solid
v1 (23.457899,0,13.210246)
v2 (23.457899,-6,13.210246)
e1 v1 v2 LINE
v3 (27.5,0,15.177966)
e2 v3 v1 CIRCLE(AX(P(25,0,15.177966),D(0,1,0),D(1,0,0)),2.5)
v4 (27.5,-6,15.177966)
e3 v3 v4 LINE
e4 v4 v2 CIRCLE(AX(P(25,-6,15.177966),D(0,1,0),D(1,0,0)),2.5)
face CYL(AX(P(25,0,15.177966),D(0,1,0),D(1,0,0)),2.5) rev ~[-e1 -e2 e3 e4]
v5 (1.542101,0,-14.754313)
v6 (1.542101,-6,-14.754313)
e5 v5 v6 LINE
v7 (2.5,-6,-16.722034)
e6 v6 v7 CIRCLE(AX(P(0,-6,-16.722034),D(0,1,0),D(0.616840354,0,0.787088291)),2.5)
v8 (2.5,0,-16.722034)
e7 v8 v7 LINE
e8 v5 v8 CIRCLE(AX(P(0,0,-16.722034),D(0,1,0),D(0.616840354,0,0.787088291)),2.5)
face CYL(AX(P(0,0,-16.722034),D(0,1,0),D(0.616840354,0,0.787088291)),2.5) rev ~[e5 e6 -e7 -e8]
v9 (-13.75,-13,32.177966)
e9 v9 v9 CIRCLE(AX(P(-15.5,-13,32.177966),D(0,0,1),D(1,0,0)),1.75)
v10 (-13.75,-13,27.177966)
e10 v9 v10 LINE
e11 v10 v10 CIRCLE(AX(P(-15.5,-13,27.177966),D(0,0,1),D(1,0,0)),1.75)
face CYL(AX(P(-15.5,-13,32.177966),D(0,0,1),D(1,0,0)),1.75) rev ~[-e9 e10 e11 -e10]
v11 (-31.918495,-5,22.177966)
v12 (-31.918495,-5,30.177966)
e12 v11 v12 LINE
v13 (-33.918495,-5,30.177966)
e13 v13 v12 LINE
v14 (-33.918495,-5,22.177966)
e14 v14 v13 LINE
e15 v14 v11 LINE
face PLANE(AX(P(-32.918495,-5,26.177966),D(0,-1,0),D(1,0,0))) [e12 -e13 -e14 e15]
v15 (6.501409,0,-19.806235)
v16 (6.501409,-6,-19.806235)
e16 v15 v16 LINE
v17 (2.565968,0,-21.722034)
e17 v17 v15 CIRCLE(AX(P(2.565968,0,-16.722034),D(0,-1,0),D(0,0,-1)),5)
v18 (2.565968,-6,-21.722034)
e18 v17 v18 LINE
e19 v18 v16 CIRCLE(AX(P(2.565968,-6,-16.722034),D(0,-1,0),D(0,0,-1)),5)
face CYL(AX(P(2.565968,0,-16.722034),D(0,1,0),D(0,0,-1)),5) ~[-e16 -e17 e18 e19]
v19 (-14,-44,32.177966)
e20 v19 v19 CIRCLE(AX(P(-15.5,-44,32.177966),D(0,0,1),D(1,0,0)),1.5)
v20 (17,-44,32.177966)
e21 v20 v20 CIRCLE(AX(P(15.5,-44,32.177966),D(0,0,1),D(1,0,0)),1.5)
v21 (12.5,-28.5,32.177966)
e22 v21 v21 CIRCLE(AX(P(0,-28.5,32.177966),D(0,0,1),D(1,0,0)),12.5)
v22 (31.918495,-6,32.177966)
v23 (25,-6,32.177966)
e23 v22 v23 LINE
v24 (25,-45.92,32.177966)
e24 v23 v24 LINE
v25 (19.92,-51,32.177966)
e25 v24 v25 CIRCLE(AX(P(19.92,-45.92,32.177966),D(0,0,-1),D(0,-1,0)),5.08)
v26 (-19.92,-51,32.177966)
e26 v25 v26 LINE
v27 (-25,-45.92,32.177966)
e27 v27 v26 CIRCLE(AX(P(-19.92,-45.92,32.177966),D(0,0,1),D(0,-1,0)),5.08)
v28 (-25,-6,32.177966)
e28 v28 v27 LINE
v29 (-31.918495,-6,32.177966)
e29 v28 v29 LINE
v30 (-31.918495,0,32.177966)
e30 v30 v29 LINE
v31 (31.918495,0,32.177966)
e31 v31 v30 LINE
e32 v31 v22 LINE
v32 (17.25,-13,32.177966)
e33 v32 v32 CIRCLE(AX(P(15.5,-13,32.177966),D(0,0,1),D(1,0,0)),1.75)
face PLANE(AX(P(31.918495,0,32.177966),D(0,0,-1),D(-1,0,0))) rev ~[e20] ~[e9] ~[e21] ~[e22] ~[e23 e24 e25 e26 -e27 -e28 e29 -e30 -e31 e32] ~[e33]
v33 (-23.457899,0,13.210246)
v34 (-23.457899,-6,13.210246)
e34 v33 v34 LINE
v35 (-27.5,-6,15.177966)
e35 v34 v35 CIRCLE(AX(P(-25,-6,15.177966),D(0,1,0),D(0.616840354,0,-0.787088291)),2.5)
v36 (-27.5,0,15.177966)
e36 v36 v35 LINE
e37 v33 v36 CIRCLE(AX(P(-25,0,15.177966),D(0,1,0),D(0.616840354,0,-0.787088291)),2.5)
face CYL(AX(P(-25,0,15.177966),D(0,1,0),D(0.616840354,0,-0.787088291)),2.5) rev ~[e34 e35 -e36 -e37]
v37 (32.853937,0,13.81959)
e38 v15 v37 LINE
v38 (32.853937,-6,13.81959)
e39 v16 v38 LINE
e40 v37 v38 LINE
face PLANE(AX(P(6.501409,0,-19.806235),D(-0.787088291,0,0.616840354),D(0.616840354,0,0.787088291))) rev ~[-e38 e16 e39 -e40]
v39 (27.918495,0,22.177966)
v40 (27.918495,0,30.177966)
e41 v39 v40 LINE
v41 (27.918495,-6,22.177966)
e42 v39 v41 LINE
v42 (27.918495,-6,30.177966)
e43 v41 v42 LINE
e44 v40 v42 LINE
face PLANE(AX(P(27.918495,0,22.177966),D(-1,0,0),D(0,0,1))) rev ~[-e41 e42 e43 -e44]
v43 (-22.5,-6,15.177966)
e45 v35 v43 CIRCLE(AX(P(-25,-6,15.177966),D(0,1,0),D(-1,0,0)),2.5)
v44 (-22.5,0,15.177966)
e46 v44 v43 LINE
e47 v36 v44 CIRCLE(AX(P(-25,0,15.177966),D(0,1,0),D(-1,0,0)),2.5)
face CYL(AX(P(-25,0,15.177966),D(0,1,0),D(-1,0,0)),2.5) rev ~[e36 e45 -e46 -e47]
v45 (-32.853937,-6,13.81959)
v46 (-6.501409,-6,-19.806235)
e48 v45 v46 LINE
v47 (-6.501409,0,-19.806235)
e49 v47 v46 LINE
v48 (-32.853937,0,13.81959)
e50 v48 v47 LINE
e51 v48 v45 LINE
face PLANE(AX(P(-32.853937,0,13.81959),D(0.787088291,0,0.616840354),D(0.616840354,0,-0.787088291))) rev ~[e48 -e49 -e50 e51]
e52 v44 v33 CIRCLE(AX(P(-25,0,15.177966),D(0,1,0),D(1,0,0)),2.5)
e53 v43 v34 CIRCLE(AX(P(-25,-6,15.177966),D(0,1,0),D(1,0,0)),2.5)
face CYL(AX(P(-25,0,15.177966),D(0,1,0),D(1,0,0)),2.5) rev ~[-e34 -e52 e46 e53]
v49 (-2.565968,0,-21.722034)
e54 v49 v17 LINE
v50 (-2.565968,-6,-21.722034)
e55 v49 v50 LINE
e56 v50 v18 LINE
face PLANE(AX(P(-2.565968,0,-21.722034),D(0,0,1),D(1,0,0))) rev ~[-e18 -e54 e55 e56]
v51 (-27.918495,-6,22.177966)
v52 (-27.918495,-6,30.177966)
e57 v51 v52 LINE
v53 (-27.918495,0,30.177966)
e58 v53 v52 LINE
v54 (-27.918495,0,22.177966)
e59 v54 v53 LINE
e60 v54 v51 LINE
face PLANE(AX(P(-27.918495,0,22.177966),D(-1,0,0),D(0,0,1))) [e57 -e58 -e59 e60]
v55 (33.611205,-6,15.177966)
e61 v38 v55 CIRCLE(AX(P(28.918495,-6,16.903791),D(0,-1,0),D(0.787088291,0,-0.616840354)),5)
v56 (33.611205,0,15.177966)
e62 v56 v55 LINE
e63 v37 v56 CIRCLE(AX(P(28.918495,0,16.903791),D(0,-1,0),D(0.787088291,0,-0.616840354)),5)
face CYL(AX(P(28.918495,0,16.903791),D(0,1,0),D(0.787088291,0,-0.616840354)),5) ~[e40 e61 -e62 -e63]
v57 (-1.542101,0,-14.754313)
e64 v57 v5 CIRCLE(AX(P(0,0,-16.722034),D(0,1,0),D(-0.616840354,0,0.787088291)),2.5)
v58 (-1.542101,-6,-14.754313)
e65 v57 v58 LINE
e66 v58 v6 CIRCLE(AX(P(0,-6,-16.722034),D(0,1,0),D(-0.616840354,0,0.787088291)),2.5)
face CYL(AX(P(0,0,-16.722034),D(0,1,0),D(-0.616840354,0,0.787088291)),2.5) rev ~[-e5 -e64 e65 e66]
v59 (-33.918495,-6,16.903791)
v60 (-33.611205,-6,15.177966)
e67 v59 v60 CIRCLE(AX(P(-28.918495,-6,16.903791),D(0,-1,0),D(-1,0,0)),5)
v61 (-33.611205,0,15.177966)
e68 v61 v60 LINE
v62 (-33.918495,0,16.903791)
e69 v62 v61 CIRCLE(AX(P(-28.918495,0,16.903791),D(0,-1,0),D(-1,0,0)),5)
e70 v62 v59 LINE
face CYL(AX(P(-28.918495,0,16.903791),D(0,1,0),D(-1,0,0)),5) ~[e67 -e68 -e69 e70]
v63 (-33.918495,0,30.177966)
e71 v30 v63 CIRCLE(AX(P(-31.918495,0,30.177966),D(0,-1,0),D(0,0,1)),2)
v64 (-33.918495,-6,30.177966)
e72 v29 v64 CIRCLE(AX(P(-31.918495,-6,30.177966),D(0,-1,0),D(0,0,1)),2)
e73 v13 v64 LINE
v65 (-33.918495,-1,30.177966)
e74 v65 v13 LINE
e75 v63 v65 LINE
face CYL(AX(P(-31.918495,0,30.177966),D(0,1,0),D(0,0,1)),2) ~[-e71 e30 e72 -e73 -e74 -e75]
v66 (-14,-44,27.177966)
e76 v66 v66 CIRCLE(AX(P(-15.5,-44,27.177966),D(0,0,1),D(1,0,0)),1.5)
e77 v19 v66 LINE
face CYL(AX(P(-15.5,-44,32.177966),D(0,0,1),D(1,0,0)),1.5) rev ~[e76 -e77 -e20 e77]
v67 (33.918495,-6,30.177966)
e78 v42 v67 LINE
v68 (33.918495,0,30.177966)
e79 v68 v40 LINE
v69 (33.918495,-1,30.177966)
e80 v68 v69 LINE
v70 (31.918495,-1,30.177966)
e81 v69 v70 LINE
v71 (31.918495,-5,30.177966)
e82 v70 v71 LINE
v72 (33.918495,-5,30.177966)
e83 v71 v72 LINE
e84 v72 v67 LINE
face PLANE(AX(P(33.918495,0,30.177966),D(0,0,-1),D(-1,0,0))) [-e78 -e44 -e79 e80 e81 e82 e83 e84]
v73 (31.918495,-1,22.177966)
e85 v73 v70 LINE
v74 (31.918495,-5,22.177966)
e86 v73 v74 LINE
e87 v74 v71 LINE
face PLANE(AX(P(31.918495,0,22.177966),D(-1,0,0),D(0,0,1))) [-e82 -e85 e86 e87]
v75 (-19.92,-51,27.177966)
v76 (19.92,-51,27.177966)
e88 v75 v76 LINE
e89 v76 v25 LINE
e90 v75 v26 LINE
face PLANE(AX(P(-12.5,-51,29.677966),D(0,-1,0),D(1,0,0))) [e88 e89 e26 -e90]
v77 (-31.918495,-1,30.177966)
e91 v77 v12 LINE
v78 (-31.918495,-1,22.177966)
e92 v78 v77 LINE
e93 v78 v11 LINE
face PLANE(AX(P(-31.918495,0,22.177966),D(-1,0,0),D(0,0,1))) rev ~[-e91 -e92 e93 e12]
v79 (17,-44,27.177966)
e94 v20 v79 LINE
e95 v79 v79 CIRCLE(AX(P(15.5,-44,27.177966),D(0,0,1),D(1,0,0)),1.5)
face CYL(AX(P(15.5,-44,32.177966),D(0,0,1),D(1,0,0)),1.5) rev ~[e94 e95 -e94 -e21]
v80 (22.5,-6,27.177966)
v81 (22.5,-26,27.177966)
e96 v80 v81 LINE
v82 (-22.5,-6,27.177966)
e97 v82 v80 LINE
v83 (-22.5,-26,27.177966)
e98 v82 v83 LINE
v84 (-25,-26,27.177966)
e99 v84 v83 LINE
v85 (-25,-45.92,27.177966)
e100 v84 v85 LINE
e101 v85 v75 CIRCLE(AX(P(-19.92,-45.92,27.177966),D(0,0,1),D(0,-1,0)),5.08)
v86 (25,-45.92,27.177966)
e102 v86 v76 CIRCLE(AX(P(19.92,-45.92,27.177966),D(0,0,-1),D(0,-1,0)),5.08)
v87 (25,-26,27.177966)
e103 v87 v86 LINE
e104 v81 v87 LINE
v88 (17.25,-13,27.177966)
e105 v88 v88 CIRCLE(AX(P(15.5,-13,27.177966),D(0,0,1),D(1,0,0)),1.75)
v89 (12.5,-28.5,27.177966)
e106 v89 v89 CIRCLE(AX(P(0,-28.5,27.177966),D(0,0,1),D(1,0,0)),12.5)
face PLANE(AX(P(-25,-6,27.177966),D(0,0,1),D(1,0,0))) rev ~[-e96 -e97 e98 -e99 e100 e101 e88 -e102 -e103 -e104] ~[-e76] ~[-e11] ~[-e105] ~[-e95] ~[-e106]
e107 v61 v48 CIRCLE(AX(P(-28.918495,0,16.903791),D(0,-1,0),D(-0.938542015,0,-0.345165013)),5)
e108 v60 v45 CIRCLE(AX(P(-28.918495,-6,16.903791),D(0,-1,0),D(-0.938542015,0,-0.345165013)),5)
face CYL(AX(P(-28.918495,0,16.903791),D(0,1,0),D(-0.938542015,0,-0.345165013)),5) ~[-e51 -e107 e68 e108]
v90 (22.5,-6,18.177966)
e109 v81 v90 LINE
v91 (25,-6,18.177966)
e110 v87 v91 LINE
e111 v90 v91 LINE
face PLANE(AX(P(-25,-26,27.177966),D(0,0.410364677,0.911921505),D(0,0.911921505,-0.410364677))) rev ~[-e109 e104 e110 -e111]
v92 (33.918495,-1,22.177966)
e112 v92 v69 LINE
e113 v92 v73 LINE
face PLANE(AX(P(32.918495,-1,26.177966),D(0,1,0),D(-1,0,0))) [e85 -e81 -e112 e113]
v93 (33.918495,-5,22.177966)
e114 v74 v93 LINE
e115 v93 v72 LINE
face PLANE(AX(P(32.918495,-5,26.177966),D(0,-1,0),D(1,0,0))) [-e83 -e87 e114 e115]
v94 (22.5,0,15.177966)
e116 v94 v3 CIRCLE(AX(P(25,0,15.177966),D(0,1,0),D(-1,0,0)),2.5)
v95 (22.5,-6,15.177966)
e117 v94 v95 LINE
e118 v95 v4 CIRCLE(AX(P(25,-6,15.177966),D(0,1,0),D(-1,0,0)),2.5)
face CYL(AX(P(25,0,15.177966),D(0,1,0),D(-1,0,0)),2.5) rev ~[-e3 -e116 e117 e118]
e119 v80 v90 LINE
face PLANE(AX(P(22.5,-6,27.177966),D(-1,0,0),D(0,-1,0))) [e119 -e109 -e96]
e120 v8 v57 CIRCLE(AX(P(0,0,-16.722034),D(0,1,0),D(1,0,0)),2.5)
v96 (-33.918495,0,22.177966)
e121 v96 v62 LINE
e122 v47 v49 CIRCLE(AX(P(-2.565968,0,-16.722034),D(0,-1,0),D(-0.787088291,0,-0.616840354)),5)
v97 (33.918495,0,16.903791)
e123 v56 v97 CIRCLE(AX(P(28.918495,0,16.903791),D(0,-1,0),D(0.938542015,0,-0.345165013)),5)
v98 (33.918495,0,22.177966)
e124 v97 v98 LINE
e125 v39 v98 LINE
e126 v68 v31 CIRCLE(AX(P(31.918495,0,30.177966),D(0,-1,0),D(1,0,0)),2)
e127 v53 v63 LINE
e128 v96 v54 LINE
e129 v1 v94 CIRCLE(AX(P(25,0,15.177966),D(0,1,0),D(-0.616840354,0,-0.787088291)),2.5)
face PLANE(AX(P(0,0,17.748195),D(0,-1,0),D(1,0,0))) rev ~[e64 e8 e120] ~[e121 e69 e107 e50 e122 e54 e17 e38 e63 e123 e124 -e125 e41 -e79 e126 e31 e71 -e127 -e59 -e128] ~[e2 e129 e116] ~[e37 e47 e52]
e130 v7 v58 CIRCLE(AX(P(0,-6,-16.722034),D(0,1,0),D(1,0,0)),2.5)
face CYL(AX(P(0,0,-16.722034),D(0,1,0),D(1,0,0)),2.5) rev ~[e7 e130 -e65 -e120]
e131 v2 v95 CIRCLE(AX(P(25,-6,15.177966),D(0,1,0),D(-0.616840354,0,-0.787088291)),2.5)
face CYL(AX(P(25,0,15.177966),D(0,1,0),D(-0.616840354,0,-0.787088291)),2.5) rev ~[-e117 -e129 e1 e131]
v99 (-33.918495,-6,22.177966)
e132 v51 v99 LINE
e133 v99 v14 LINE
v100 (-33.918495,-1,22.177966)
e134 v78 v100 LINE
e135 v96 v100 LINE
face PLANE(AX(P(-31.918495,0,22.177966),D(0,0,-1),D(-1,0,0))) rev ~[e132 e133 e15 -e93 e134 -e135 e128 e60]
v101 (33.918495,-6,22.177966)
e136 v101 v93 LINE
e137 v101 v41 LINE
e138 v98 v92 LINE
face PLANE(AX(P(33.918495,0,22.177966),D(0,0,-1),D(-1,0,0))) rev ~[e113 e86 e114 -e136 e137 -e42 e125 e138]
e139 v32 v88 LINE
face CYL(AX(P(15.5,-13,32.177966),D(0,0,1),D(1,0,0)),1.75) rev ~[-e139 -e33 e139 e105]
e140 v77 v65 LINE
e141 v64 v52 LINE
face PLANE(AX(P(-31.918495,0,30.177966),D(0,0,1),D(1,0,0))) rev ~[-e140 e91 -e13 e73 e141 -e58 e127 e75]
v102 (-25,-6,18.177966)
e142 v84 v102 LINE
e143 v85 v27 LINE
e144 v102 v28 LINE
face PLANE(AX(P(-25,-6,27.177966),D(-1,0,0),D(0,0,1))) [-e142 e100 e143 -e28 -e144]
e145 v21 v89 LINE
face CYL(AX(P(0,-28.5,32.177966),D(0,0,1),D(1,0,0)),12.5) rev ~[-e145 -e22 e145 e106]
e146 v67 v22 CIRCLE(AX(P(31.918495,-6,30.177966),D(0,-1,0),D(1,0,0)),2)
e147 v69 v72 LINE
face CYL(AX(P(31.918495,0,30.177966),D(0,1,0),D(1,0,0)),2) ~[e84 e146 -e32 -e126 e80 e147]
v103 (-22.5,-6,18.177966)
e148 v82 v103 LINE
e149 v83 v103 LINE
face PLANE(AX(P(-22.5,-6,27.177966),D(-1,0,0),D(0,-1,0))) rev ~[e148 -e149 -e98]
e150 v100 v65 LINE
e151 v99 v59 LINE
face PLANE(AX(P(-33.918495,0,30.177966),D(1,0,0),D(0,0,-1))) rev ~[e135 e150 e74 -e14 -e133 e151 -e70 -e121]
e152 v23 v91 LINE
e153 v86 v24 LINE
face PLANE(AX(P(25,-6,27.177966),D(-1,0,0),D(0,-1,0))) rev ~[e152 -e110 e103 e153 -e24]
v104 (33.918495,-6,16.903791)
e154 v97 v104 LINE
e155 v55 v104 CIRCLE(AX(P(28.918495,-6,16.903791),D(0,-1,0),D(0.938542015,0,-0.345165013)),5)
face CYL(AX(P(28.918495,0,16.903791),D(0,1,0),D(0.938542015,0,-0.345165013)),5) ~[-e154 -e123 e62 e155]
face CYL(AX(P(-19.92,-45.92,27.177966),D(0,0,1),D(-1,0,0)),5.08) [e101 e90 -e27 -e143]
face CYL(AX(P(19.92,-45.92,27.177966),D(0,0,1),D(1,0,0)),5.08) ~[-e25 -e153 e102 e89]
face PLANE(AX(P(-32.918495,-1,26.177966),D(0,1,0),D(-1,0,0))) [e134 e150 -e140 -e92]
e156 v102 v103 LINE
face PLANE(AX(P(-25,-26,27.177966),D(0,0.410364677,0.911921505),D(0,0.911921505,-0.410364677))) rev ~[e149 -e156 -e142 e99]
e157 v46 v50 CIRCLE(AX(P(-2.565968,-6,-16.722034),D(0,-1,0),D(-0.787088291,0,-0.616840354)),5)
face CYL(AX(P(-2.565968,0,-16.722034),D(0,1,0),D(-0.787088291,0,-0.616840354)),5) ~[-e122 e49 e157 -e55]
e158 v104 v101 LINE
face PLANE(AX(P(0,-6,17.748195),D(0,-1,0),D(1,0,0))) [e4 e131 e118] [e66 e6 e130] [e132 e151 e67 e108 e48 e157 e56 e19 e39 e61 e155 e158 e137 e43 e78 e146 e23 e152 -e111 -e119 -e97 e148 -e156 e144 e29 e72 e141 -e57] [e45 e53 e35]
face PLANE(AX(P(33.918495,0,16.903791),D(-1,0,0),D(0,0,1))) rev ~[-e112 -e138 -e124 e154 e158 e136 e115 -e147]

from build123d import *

# Parameters (mm, degrees)
F0_W      = 4
F0_H      = 8
F0_W_2    = 2
F1_DEPTH  = 6
F2_W      = 2
F2_H      = 8
F3_DEPTH  = 1
F4_W      = 2
F4_H      = 8
F5_DEPTH  = 1
F6_W      = 25
F6_H      = 5
F7_DEPTH  = 45
F8_R      = 5.08
F9_W      = 2.5
F9_H      = 20
F10_DEPTH = 9
F12_DEPTH = 50.292
F13_R     = 12.5
F13_R_2   = 1.75
F13_R_3   = 1.5
F14_DEPTH = 25.4


# Not quite as in the source:
# - a feature names something its author has since deleted; it is built from what else it names


with BuildPart() as f1:
    # F0 (on Front) → F1 (new body)
    with BuildSketch(Plane.XZ):
        with BuildLine():
            Line((-22.5, 15.1779663801), (-15.95, 15.1779663801))
            Line((-15.95, 15.1779663801), (15.95, 15.1779663801))
            Line((15.95, 15.1779663801), (22.5, 15.1779663801))
            ThreePointArc((22.5, 15.1779663801), (25, 17.6779663801), (27.5, 15.1779663801))
            Line((27.5, 15.1779663801), (33.6112053721, 15.1779663801))
            ThreePointArc((33.6112053721, 15.1779663801), (33.8410734014, 16.027307097), (33.9184952978, 16.9037914461))
            Line((33.9184952978, 16.9037914461), (33.9184952978, 19.2973875134))
            Line((33.9184952978, 19.2973875134), (33.9184952978, 20.1779663801))
            Line((33.9184952978, 20.1779663801), (33.0379164311, 20.1779663801))
            Line((33.0379164311, 20.1779663801), (-32.6408470514, 20.1779663801))
            Line((-32.6408470514, 20.1779663801), (-33.9184952978, 20.1779663801))
            Line((-33.9184952978, 20.1779663801), (-33.9184952978, 18.9003181337))
            Line((-33.9184952978, 18.9003181337), (-33.9184952978, 16.9037914461))
            ThreePointArc((-33.9184952978, 16.9037914461), (-33.8410734014, 16.027307097), (-33.6112053721, 15.1779663801))
            Line((-33.6112053721, 15.1779663801), (-27.5, 15.1779663801))
            ThreePointArc((-27.5, 15.1779663801), (-25, 17.6779663801), (-22.5, 15.1779663801))
        make_face()
        with BuildLine():
            Line((15.95, 15.1779663801), (-15.95, 15.1779663801))
            Line((-15.95, 15.1779663801), (-22.5, 15.1779663801))
            ThreePointArc((-22.5, 15.1779663801), (-22.7521952698, 14.0837205691), (-23.457899116, 13.2102456521))
            Line((-23.457899116, 13.2102456521), (-1.542100884, -14.7543128919))
            ThreePointArc((-1.542100884, -14.7543128919), (0, -14.2220336199), (1.542100884, -14.7543128919))
            Line((1.542100884, -14.7543128919), (23.457899116, 13.2102456521))
            ThreePointArc((23.457899116, 13.2102456521), (22.7521952698, 14.0837205691), (22.5, 15.1779663801))
            Line((22.5, 15.1779663801), (15.95, 15.1779663801))
        make_face()
        with BuildLine():
            ThreePointArc((-23.457899116, 13.2102456521), (-26.094245811, 12.9301616499), (-27.5, 15.1779663801))
            Line((-27.5, 15.1779663801), (-33.6112053721, 15.1779663801))
            ThreePointArc((-33.6112053721, 15.1779663801), (-33.28570797, 14.4691552359), (-32.8539367538, 13.819589678))
            Line((-32.8539367538, 13.819589678), (-6.5014092727, -19.8062353879))
            ThreePointArc((-6.5014092727, -19.8062353879), (-4.7544594387, -21.2176430802), (-2.5659678166, -21.7220336199))
            Line((-2.5659678166, -21.7220336199), (0, -21.7220336199))
            Line((0, -21.7220336199), (0, -19.2220336199))
            ThreePointArc((0, -19.2220336199), (-2.3631866008, -17.5377229541), (-1.542100884, -14.7543128919))
            Line((-1.542100884, -14.7543128919), (-23.457899116, 13.2102456521))
        make_face()
        with BuildLine():
            Line((33.6112053721, 15.1779663801), (27.5, 15.1779663801))
            ThreePointArc((27.5, 15.1779663801), (26.094245811, 12.9301616499), (23.457899116, 13.2102456521))
            Line((23.457899116, 13.2102456521), (1.542100884, -14.7543128919))
            ThreePointArc((1.542100884, -14.7543128919), (2.2478047302, -15.6277878088), (2.5, -16.7220336199))
            ThreePointArc((2.5, -16.7220336199), (1.767766953, -18.4898005728), (0, -19.2220336199))
            Line((0, -19.2220336199), (0, -21.7220336199))
            Line((0, -21.7220336199), (2.5659678166, -21.7220336199))
            ThreePointArc((2.5659678166, -21.7220336199), (4.7544594387, -21.2176430802), (6.5014092727, -19.8062353879))
            Line((6.5014092727, -19.8062353879), (32.8539367538, 13.819589678))
            ThreePointArc((32.8539367538, 13.819589678), (33.28570797, 14.4691552359), (33.6112053721, 15.1779663801))
        make_face()
        with BuildLine():
            Line((-33.9184952978, 30.1779663801), (-33.9184952978, 20.1779663801))
            Line((-33.9184952978, 20.1779663801), (-32.6408470514, 20.1779663801))
            Line((-32.6408470514, 20.1779663801), (33.0379164311, 20.1779663801))
            Line((33.0379164311, 20.1779663801), (33.9184952978, 20.1779663801))
            Line((33.9184952978, 20.1779663801), (33.9184952978, 22.1779663801))
            Line((33.9184952978, 22.1779663801), (31.9184952978, 22.1779663801))
            Line((31.9184952978, 22.1779663801), (27.9184952978, 22.1779663801))
            Line((27.9184952978, 22.1779663801), (27.9184952978, 30.1779663801))
            Line((27.9184952978, 30.1779663801), (31.9184952978, 30.1779663801))
            Line((31.9184952978, 30.1779663801), (33.9184952978, 30.1779663801))
            ThreePointArc((33.9184952978, 30.1779663801), (33.3327088602, 31.5921799425), (31.9184952978, 32.1779663801))
            Line((31.9184952978, 32.1779663801), (-31.9184952978, 32.1779663801))
            ThreePointArc((-31.9184952978, 32.1779663801), (-33.3327088602, 31.5921799425), (-33.9184952978, 30.1779663801))
        make_face()
        with Locations((-29.9184952978, 26.1779663801)):
            Rectangle(F0_W, F0_H, mode=Mode.SUBTRACT)
        with Locations((32.9184952978, 26.1779663801)):
            Rectangle(F0_W_2, F0_H)
    extrude(amount=F1_DEPTH)

    # F2 (on face) → F3 (cut)
    with BuildSketch(Plane(origin=(0, 0, 0), x_dir=(-1, 0, 0), z_dir=(0, 1, 0))):
        with Locations((-32.9184952978, 26.1779663801)):
            Rectangle(F2_W, F2_H)
        with Locations((32.9184952978, 26.1779663801)):
            Rectangle(F2_W, F2_H)
    extrude(amount=-F3_DEPTH, mode=Mode.SUBTRACT)

    # F4 (on face) → F5 (cut)
    with BuildSketch(Plane.XZ.offset(6)):
        with Locations((-32.9184952978, 26.1779663801)):
            Rectangle(F4_W, F4_H)
        with Locations((32.9184952978, 26.1779663801)):
            Rectangle(F4_W, F4_H)
    extrude(amount=-F5_DEPTH, mode=Mode.SUBTRACT)

    # F6 (on face) → F7 (join)
    with BuildSketch(Plane.XZ.offset(6)):
        with Locations((-12.5, 29.6779663801)):
            Rectangle(F6_W, F6_H)
        with Locations((12.5, 29.6779663801)):
            Rectangle(F6_W, F6_H)
    extrude(amount=F7_DEPTH)

    # F8
    f8_edges = [f1.edges().sort_by_distance(p)[0] for p in [
        (25, -51, 29.677966),
        (-25, -51, 29.677966),
    ]]
    fillet(f8_edges, radius=F8_R)

    # F9 (on face) → F10 (join)
    with BuildSketch(Plane(origin=(0, 0, 27.1779663801), x_dir=(1, 0, 0), z_dir=(0, 0, -1))):
        with Locations((23.75, 16)):
            Rectangle(F9_W, F9_H)
        with Locations((-23.75, 16)):
            Rectangle(F9_W, F9_H)
    extrude(amount=F10_DEPTH)

    # F11 (on face) → F12 (cut)
    with BuildSketch(Plane(origin=(-25, 0, 0), x_dir=(0, -1, 0), z_dir=(-1, 0, 0))):
        Polygon((26, 27.1779663801), (6, 18.1779663801), (26, 18.1779663801), align=None)
    extrude(amount=-F12_DEPTH, mode=Mode.SUBTRACT)

    # F13 (on face) → F14 (cut)
    with BuildSketch(Plane.XY.offset(32.1779663801)):
        with Locations((0, -28.5)):
            Circle(F13_R)
        with Locations((-15.5, -13)):
            Circle(F13_R_2)
        with Locations((15.5, -13)):
            Circle(F13_R_2)
        with Locations((15.5, -44)):
            Circle(F13_R_3)
        with Locations((-15.5, -44)):
            Circle(F13_R_3)
    extrude(amount=-F14_DEPTH, mode=Mode.SUBTRACT)


solid = f1.part
